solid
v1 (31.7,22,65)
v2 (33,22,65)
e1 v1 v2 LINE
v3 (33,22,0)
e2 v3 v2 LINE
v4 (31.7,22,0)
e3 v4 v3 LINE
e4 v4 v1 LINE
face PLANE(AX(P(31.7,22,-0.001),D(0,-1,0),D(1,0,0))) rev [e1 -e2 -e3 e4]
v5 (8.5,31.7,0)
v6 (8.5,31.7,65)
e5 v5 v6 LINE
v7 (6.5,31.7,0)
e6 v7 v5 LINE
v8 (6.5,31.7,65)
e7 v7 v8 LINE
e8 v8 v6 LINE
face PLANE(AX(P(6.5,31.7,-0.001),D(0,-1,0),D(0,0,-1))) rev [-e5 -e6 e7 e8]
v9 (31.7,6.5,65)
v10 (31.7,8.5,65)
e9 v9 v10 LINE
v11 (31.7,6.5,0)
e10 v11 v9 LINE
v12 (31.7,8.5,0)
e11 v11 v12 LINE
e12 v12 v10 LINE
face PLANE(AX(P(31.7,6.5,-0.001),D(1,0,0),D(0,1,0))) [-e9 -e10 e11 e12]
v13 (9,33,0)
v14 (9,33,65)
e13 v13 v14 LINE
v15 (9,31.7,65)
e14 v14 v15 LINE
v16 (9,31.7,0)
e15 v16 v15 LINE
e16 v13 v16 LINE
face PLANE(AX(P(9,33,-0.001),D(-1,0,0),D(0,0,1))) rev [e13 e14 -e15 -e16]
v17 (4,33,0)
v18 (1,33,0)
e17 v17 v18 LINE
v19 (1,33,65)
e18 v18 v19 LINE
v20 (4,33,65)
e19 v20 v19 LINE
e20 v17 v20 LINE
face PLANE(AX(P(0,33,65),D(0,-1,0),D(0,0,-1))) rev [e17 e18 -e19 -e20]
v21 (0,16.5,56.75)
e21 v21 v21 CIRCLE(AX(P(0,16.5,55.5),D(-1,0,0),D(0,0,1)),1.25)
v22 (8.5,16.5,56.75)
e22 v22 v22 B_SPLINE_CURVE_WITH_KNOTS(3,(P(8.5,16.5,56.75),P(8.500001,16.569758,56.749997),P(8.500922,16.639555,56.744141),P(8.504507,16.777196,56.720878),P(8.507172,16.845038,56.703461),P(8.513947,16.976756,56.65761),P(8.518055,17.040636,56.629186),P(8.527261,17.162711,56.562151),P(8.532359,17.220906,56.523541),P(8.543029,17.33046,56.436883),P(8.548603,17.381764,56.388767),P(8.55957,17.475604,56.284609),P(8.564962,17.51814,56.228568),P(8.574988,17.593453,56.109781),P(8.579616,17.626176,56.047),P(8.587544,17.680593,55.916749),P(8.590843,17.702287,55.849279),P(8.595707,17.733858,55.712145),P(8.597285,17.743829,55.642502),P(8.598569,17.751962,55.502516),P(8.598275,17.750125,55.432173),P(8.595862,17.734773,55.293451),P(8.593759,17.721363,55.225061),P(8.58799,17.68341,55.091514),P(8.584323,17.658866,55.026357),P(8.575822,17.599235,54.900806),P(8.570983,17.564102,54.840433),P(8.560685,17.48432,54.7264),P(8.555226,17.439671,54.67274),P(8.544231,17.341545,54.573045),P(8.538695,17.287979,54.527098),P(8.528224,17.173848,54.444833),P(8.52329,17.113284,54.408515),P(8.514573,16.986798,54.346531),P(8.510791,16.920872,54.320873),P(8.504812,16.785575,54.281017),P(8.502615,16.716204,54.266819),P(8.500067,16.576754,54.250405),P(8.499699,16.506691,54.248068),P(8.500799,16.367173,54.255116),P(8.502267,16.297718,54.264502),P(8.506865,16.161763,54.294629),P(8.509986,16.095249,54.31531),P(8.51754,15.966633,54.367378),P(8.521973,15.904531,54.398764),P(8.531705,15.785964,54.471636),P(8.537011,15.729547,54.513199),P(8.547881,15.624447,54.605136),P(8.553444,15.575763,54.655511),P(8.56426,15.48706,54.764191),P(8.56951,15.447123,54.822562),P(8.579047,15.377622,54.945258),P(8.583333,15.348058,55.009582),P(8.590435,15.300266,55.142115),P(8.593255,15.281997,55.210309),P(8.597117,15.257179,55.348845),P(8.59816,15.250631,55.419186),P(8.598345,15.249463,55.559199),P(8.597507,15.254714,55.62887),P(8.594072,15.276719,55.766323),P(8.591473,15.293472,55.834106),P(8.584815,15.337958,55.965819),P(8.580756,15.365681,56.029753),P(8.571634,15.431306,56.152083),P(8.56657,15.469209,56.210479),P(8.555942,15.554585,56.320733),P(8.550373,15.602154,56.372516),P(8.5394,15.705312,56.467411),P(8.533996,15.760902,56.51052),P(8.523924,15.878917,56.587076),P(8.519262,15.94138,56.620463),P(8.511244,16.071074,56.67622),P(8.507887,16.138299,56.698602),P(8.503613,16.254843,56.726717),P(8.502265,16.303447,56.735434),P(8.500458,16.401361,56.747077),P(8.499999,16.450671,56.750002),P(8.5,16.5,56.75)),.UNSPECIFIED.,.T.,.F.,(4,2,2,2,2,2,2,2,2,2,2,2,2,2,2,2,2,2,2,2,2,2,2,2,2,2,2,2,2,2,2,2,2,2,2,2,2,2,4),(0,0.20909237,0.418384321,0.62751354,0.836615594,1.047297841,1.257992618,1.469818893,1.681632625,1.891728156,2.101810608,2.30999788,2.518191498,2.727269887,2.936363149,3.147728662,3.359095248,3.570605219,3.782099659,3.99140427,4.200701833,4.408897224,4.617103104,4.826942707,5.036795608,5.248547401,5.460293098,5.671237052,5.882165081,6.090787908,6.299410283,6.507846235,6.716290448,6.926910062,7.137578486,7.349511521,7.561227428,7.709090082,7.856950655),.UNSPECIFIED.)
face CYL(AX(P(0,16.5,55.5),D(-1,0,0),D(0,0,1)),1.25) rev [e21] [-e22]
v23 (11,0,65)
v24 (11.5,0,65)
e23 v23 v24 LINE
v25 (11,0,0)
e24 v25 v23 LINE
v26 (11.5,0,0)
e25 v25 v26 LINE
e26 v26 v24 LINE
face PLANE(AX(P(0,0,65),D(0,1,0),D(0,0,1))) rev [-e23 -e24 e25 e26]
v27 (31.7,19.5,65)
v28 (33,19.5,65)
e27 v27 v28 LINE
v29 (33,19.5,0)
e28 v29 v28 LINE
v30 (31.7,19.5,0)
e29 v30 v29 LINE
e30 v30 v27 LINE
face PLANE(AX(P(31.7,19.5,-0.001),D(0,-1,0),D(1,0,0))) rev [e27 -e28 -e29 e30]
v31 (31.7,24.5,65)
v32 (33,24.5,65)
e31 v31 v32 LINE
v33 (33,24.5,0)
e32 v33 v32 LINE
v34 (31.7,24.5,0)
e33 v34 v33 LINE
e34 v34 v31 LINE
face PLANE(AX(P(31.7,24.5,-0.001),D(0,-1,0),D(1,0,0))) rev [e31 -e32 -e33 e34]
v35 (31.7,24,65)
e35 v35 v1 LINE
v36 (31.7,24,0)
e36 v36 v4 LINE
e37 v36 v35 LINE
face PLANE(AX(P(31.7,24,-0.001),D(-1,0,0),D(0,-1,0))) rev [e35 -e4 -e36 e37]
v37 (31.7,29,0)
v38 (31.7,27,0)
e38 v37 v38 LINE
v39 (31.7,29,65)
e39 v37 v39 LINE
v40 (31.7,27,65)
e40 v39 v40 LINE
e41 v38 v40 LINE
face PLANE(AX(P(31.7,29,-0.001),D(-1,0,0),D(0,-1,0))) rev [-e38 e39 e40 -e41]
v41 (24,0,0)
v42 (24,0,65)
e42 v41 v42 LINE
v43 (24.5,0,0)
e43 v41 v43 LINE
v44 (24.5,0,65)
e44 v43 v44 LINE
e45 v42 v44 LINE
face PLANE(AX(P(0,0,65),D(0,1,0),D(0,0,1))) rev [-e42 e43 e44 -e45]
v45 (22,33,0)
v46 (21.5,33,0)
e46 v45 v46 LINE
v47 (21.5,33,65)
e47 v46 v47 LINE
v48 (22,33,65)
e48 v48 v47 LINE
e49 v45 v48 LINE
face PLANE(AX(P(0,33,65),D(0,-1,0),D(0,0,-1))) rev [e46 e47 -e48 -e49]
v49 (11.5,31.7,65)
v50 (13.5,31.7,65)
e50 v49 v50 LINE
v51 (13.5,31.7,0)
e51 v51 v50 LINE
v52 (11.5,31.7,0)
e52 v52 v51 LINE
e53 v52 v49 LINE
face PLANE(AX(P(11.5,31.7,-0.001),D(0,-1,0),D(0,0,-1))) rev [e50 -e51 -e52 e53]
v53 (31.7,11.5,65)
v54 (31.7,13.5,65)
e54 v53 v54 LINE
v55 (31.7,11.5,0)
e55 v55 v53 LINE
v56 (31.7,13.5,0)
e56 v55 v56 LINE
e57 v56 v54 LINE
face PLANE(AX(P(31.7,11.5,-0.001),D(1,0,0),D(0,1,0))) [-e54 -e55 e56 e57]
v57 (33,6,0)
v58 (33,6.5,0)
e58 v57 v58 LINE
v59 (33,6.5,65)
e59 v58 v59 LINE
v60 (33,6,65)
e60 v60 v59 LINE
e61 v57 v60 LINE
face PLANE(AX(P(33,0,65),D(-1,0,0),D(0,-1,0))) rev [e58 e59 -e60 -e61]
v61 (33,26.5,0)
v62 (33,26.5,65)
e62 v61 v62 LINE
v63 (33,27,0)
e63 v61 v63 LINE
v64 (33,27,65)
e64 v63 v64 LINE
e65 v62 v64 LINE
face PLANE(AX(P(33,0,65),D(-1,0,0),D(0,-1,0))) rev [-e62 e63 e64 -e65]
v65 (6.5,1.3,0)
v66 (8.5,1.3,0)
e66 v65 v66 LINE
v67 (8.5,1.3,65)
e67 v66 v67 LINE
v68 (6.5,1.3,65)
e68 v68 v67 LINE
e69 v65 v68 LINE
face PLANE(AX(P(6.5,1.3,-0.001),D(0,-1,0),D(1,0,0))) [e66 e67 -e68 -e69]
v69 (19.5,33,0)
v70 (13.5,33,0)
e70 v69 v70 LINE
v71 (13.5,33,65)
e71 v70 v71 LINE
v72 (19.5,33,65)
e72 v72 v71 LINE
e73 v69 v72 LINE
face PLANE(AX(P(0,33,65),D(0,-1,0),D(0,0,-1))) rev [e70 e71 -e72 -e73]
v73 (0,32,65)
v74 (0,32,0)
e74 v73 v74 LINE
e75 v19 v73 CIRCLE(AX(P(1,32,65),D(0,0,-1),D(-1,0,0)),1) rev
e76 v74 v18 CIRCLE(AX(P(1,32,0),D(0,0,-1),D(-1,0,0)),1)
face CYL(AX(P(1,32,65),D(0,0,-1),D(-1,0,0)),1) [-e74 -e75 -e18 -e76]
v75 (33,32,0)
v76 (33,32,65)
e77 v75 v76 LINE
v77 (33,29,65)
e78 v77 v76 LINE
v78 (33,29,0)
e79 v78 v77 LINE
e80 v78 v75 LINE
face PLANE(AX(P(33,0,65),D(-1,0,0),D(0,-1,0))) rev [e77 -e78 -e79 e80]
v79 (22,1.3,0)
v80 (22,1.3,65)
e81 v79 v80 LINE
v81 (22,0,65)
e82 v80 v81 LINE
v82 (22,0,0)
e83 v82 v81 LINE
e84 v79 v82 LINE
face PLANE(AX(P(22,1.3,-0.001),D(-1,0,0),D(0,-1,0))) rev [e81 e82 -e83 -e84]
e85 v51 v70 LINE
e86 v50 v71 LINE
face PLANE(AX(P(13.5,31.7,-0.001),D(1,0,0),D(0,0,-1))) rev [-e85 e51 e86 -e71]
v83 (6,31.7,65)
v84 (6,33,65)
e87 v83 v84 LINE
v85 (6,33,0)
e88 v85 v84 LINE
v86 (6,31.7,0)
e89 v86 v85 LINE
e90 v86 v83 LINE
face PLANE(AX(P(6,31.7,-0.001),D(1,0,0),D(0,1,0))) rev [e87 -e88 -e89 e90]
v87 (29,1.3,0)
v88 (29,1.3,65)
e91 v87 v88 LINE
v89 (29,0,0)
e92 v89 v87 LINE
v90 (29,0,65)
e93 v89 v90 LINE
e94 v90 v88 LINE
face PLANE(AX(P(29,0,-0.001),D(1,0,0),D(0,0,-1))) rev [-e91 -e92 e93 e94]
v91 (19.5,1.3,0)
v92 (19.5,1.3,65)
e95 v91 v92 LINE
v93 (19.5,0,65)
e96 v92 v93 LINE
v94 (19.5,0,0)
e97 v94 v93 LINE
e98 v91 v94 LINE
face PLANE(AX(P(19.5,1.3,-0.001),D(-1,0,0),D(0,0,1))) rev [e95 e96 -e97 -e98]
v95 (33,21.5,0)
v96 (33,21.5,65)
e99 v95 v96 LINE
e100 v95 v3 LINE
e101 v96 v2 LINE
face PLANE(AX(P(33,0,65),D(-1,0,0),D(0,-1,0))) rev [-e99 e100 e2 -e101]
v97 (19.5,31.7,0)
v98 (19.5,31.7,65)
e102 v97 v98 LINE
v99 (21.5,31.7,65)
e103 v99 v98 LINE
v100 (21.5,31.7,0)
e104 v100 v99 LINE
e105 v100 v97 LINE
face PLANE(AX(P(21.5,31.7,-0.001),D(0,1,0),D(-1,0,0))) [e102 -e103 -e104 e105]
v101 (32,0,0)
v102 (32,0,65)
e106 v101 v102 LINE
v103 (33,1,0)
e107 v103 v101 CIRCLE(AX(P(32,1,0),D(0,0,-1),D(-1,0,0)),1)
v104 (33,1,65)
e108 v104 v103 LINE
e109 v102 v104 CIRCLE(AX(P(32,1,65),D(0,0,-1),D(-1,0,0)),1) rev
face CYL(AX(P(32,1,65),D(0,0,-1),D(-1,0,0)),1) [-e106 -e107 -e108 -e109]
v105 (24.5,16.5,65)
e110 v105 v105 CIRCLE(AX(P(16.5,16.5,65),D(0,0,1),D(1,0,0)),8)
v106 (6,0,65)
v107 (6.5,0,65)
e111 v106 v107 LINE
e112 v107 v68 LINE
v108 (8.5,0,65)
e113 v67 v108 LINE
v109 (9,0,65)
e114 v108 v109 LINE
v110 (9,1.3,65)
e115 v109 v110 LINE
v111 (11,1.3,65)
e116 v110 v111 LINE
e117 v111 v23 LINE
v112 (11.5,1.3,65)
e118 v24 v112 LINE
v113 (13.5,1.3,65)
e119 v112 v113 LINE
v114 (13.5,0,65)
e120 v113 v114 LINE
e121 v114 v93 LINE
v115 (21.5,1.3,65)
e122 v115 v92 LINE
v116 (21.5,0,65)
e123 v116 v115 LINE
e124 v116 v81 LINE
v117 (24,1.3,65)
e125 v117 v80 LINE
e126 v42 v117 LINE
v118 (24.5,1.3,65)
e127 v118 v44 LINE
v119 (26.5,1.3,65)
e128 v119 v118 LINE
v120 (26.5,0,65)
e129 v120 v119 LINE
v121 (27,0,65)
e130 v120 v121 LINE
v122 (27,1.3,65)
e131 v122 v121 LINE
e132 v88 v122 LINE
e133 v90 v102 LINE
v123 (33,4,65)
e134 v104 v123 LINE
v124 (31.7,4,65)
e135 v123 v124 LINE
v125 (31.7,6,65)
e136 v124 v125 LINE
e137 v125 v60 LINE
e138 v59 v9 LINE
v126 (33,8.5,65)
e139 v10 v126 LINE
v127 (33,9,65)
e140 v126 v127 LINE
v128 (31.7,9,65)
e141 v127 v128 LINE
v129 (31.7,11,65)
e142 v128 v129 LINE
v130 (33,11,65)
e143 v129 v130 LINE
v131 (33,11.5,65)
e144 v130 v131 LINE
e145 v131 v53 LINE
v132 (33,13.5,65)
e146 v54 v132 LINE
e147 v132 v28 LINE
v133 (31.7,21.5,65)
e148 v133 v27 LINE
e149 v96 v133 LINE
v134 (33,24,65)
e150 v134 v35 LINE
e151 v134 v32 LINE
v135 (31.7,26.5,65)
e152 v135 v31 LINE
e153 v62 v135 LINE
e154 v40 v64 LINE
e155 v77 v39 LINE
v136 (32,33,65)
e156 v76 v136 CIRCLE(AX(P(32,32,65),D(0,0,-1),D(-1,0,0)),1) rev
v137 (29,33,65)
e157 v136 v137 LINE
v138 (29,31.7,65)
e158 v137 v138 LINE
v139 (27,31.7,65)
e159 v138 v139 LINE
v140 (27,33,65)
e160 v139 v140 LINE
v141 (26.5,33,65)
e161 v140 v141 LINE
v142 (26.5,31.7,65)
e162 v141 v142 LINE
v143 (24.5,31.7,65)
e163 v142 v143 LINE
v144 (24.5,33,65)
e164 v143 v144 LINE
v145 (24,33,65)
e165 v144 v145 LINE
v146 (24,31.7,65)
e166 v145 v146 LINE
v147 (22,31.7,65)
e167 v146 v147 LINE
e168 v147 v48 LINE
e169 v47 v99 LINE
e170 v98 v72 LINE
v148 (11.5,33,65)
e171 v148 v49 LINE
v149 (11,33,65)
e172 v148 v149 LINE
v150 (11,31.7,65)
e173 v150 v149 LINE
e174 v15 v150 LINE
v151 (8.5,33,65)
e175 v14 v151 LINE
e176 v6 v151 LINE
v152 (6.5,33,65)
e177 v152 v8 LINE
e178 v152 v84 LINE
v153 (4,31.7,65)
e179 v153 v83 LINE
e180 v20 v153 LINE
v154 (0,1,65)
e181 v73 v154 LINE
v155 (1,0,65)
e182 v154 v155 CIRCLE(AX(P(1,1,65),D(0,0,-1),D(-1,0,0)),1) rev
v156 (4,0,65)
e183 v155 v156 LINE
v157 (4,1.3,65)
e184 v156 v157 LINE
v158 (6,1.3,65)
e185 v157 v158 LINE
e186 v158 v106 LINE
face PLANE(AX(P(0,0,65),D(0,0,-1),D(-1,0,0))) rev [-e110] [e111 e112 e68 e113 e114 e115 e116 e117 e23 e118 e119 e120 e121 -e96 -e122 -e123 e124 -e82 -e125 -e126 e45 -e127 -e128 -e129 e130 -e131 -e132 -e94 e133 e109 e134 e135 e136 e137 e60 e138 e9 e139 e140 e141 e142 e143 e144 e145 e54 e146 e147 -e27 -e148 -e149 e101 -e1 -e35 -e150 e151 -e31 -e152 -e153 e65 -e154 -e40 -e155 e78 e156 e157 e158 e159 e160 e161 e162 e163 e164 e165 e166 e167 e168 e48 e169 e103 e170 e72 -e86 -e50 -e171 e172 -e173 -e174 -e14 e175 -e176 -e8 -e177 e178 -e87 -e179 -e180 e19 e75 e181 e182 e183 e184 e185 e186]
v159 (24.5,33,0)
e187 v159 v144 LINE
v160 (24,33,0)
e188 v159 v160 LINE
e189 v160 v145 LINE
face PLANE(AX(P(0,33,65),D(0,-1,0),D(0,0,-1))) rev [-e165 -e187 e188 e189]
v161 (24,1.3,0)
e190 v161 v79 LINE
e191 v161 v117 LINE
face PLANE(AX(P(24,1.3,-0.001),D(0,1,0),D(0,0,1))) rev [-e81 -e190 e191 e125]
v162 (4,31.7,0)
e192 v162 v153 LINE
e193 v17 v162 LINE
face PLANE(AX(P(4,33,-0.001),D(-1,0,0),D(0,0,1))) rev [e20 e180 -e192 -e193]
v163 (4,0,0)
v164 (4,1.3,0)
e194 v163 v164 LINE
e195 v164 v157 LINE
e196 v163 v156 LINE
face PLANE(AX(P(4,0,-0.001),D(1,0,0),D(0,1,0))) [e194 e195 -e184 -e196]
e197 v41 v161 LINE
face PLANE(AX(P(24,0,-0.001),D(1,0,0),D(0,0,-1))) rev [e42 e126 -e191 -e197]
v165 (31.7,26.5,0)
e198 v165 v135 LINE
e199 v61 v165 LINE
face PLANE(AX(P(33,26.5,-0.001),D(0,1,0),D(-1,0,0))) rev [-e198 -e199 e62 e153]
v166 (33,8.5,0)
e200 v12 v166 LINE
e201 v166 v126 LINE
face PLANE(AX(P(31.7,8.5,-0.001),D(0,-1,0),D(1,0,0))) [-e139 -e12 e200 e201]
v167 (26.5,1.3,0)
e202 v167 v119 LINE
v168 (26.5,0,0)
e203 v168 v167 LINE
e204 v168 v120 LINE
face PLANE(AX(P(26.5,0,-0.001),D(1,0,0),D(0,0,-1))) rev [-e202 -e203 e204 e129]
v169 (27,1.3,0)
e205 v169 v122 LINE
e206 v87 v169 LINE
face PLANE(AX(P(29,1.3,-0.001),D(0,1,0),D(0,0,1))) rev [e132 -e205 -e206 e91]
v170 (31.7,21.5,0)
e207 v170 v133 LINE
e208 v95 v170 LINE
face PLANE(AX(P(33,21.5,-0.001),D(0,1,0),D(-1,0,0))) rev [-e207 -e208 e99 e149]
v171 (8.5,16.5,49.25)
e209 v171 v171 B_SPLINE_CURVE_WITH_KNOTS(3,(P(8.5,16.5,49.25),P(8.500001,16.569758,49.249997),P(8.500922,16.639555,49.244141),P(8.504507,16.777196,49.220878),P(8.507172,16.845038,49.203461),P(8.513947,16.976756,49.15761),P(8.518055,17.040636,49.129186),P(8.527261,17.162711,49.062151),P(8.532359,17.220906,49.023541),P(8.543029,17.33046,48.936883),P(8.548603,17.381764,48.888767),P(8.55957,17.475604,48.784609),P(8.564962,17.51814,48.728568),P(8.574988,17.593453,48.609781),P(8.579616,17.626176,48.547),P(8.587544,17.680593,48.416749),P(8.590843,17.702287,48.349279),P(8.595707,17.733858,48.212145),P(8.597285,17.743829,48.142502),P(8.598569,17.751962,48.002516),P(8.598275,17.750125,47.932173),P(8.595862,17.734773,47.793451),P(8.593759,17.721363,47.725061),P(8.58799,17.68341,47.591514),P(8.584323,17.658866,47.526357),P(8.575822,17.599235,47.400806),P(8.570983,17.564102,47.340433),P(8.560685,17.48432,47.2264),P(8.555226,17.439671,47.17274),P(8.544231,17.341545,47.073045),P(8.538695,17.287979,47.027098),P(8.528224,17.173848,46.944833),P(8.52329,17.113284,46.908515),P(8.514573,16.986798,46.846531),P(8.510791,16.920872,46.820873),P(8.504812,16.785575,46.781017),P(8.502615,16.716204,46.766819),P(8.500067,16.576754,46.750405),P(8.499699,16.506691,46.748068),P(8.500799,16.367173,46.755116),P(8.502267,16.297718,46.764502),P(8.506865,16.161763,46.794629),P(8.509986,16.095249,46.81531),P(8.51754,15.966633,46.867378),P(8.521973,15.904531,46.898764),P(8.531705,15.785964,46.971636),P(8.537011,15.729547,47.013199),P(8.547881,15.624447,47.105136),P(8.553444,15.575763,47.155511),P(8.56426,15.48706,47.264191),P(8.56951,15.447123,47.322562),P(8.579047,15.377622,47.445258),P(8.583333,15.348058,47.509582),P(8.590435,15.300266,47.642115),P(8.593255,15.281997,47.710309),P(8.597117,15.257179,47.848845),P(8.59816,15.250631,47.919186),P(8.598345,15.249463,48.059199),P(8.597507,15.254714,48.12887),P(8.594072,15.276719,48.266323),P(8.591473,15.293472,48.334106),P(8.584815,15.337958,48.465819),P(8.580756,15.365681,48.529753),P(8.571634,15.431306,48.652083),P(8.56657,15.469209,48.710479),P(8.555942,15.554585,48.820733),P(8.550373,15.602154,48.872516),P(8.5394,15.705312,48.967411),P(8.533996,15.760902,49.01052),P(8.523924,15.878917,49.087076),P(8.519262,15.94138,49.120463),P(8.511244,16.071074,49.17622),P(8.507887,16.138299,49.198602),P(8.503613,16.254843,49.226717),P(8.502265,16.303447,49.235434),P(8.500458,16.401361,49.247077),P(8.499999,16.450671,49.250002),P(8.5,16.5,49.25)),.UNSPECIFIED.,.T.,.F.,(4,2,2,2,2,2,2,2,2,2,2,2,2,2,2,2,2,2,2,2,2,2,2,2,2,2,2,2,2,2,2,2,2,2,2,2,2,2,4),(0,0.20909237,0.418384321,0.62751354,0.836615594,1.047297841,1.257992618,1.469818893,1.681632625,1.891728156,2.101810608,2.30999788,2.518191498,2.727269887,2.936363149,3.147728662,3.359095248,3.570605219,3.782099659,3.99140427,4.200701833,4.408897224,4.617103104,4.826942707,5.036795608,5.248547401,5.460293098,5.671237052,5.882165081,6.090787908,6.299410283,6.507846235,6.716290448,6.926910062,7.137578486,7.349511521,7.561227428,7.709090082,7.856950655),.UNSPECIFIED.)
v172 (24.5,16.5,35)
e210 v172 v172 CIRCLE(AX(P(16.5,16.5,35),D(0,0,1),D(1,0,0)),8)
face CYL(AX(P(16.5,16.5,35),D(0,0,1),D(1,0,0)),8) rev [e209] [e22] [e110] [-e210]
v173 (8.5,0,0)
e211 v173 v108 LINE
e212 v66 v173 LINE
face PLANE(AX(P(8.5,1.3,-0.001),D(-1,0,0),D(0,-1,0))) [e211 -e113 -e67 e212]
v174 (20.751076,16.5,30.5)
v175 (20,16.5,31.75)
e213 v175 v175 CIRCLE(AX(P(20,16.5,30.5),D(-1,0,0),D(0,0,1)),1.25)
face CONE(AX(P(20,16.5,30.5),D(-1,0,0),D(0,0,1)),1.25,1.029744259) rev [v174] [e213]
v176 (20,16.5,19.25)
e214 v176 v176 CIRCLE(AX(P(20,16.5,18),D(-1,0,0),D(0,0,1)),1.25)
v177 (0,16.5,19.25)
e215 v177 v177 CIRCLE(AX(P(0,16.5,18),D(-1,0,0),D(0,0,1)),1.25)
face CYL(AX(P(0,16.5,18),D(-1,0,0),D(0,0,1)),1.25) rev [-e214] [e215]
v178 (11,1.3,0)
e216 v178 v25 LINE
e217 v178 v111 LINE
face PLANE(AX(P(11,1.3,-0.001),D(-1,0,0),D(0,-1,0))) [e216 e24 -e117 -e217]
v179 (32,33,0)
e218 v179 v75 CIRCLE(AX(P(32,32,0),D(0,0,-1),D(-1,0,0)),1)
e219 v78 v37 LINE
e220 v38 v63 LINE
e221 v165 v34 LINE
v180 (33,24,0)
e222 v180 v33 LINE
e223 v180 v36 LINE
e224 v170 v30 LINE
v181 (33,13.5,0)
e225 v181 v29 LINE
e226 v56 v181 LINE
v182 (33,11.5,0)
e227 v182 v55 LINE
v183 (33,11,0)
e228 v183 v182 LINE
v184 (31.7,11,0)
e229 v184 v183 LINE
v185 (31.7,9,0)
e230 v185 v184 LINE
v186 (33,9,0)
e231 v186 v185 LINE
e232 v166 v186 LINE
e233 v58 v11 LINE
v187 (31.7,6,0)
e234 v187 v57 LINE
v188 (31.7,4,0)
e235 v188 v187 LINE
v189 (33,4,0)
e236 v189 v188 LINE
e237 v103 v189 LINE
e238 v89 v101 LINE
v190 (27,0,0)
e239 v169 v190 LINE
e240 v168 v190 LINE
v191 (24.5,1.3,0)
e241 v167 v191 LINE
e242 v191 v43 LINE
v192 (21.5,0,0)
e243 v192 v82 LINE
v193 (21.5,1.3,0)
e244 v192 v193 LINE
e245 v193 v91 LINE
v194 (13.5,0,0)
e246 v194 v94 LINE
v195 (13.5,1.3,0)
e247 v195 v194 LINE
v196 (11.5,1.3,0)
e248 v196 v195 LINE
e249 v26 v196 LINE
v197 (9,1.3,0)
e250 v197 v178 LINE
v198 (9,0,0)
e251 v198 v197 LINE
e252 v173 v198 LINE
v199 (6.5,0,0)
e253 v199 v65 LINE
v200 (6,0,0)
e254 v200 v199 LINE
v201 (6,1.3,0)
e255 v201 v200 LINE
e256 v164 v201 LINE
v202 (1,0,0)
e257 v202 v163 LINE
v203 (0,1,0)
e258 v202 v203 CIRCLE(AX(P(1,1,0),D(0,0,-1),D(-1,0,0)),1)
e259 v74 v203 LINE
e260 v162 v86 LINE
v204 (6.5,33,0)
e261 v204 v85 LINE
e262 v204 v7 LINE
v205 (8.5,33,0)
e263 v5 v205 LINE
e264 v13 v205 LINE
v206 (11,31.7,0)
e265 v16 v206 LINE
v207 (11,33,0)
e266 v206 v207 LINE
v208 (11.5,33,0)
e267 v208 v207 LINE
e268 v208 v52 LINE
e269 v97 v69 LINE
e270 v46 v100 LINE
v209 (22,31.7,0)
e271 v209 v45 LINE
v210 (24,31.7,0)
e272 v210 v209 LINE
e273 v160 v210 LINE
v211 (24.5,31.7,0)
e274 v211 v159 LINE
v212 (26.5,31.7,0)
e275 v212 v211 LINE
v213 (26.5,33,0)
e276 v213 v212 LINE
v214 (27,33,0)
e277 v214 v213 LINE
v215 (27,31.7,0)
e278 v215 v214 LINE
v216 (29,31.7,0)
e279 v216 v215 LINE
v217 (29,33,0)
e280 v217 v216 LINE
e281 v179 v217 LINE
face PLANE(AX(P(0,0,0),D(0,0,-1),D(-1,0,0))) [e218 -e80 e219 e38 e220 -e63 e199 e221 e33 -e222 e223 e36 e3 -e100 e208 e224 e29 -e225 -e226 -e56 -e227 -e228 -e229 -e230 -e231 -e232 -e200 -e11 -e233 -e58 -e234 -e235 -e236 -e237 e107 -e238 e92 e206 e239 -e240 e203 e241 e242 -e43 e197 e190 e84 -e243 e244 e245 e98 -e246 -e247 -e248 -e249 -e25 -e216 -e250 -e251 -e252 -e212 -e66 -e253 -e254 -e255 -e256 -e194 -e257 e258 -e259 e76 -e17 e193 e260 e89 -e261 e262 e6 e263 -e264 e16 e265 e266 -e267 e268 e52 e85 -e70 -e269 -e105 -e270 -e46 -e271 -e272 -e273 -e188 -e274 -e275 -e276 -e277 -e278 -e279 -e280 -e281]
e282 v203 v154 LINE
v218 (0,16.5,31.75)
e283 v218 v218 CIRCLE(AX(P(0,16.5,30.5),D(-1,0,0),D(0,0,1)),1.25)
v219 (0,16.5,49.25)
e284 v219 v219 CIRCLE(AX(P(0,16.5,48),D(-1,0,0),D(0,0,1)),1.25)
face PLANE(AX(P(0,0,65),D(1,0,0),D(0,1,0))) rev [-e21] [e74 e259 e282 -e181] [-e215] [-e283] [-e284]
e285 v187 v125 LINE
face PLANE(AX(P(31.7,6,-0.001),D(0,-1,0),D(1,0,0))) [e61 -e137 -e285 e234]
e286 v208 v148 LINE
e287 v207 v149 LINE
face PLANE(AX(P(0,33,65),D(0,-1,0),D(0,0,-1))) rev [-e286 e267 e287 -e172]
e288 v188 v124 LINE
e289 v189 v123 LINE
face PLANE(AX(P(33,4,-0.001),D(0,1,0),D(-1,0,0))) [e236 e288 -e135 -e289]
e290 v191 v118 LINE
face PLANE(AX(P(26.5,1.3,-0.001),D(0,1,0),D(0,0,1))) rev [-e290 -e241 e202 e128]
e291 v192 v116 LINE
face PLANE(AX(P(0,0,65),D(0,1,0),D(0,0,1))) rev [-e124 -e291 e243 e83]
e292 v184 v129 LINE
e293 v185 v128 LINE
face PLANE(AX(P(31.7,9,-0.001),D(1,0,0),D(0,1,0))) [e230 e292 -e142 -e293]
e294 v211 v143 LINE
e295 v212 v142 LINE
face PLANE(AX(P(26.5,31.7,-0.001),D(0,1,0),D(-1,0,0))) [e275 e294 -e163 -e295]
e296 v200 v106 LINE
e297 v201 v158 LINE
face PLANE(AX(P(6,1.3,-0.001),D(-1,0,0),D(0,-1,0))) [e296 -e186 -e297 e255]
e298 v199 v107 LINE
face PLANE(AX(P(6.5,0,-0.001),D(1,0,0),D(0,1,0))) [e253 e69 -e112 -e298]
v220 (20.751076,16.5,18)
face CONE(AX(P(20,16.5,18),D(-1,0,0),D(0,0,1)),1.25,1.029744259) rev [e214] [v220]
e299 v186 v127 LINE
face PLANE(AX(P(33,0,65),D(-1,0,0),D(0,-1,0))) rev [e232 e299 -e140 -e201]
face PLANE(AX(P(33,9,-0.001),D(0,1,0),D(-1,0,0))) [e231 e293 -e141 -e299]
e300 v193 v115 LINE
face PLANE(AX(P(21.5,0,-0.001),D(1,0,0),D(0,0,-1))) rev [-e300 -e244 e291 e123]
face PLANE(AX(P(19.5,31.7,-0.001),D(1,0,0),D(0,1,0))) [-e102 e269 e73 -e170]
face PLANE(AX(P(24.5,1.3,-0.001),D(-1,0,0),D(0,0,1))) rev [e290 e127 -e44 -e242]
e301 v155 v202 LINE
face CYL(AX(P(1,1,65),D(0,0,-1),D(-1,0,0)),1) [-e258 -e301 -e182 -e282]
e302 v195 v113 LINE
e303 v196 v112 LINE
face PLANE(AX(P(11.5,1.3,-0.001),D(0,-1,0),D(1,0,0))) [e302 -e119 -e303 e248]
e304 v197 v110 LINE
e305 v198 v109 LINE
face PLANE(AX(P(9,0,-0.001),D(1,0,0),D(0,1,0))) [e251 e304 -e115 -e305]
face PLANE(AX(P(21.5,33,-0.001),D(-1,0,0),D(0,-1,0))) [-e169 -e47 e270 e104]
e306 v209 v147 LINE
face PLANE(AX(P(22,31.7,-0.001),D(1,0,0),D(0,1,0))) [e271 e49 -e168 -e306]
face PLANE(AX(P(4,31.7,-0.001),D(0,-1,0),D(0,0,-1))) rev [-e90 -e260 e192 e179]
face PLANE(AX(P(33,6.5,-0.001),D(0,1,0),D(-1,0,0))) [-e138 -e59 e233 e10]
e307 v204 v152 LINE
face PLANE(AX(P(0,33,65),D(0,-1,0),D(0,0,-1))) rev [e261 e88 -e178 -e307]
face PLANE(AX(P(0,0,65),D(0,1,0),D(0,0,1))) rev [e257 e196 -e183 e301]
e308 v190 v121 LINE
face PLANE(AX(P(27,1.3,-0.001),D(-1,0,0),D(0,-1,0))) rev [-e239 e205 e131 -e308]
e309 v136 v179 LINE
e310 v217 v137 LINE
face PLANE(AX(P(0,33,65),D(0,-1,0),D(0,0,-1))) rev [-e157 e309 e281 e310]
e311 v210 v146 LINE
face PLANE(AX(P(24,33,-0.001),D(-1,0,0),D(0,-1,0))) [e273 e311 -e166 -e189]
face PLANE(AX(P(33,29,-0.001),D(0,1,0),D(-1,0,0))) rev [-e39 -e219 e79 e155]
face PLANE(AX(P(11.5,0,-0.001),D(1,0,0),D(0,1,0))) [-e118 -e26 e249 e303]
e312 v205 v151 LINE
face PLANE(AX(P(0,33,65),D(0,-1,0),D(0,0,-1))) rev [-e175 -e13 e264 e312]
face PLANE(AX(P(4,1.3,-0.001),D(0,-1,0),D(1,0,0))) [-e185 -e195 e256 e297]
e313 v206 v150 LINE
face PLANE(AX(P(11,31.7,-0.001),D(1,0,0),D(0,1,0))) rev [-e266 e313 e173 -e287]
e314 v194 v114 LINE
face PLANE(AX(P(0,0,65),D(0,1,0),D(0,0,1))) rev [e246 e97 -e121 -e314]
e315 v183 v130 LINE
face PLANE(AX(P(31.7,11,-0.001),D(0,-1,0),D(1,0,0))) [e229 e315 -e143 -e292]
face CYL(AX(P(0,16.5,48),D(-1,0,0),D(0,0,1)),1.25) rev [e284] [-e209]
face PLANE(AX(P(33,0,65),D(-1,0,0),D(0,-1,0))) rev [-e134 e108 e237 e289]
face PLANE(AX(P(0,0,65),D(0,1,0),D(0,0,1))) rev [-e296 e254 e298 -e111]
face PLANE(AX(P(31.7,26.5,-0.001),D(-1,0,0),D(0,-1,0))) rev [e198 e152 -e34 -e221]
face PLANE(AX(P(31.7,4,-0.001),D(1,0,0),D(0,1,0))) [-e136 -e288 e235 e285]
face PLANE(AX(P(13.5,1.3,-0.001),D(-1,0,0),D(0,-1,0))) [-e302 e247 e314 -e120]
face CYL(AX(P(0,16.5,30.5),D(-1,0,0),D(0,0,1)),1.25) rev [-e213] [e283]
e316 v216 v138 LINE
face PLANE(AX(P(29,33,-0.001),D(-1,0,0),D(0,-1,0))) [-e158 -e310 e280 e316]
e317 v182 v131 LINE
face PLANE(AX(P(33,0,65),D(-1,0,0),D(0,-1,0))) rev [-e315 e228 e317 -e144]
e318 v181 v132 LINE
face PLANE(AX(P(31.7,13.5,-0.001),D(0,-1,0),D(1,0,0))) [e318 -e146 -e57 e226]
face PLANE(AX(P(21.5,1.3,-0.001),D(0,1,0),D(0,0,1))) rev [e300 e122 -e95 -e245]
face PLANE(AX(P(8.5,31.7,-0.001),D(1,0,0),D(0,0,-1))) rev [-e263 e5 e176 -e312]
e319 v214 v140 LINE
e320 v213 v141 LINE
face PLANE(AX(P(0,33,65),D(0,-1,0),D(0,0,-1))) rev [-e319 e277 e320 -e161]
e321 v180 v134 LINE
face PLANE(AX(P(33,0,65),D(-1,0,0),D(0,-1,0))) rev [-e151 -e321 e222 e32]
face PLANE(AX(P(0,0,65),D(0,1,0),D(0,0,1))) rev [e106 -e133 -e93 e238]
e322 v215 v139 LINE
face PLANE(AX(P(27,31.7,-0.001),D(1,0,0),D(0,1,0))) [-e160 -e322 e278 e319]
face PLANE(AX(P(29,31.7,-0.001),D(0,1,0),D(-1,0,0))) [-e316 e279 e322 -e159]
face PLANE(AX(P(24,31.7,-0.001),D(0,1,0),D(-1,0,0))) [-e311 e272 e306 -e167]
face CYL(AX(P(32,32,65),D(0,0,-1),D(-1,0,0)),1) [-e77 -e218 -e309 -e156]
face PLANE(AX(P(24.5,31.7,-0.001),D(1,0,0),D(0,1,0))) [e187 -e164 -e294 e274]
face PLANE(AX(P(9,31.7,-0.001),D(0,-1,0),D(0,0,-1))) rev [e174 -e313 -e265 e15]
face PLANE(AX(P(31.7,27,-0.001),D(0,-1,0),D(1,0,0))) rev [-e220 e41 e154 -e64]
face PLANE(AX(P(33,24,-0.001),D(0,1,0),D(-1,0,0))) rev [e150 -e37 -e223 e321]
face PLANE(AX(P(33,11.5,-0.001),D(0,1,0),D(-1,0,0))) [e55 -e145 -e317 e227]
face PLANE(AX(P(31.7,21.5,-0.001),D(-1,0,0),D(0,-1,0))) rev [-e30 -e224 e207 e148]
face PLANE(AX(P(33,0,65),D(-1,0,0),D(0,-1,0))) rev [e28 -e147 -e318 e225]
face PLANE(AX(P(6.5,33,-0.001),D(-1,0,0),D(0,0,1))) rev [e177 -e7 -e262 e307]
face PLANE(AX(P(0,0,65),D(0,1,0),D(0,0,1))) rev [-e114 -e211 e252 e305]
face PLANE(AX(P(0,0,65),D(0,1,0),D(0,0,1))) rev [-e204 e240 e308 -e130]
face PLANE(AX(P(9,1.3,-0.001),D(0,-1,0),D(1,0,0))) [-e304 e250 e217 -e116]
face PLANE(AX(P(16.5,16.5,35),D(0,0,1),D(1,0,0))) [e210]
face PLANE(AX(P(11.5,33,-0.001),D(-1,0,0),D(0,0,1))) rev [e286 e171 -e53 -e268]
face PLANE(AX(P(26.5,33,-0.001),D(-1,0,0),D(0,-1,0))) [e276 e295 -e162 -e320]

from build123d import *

# Parameters (mm, degrees)
SKETCH1_W                   = 33
SKETCH1_H                   = 33
BOSS_EXTRUDE1_DEPTH         = 65
FILLET1_R                   = 1
CUT_EXTRUDE2_START          = -30
CUT_EXTRUDE2_OUTLINE_R      = 8
CUT_EXTRUDE2_DEPTH          = 30
TAP_DRILL_FOR_M3_TAP1_D     = 2.5
TAP_DRILL_FOR_M3_TAP1_DEPTH = 20
TAP_DRILL_FOR_M3_TAP1_TIP   = 0.751075774
CUT_EXTRUDE5_REACH          = 82.019
SKETCH6_W                   = 2
SKETCH6_H                   = 1.3
CIRPATTERN1_COUNT           = 3
CIRPATTERN1_ANGLE           = 180
CIRPATTERN1_COPY_1_REACH    = 82.019
CIRPATTERN1_COPY_1_SKETCH_W = 2
CIRPATTERN1_COPY_1_SKETCH_H = 1.3
CIRPATTERN1_COPY_2_REACH    = 82.019
CIRPATTERN1_COPY_2_SKETCH_W = 2
CIRPATTERN1_COPY_2_SKETCH_H = 1.3


# Read off the part's stored shape, not the designer's step: Cut-Extrude2
with BuildPart() as part:
    # Sketch1 → Boss-Extrude1 (new body)
    with BuildSketch(Plane.XY):
        with Locations((16.5, 16.5)):
            Rectangle(SKETCH1_W, SKETCH1_H)
    extrude(amount=BOSS_EXTRUDE1_DEPTH)

    # Fillet1
    fillet1_edges = [part.edges().sort_by_distance(p)[0] for p in [
        (0, 33, 32.5),
        (33, 33, 32.5),
        (33, 0, 32.5),
        (0, 0, 32.5),
    ]]
    fillet(fillet1_edges, radius=FILLET1_R)

    # Cut-Extrude2 outline → Cut-Extrude2 (cut)
    with BuildSketch(Plane.XY.offset(65).offset(CUT_EXTRUDE2_START)):
        with Locations((16.5, 16.5)):
            Circle(CUT_EXTRUDE2_OUTLINE_R)
    extrude(amount=CUT_EXTRUDE2_DEPTH, mode=Mode.SUBTRACT)

    # Tap Drill for M3 Tap1
    with Locations(Plane(origin=(0, 0, 0), x_dir=(0, -1, 0), z_dir=(-1, 0, 0))):
        with Locations((-16.5, 55.5), (-16.5, 48), (-16.5, 30.5), (-16.5, 18)):
            Hole(TAP_DRILL_FOR_M3_TAP1_D / 2, depth=TAP_DRILL_FOR_M3_TAP1_DEPTH)
            with Locations((0, 0, -(TAP_DRILL_FOR_M3_TAP1_DEPTH + TAP_DRILL_FOR_M3_TAP1_TIP / 2))):  # 118° drill point
                Cone(0, TAP_DRILL_FOR_M3_TAP1_D / 2, TAP_DRILL_FOR_M3_TAP1_TIP, mode=Mode.SUBTRACT)

    # Sketch6 → Cut-Extrude5 (cut, up to next)
    with BuildSketch(Plane.XY.offset(65), mode=Mode.PRIVATE) as cut_extrude5_sk1:
        with Locations((5, 32.35)):
            Rectangle(SKETCH6_W, SKETCH6_H)
    cut_extrude5_tool1 = extrude(cut_extrude5_sk1.sketch, amount=-CUT_EXTRUDE5_REACH, mode=Mode.PRIVATE) & part.part
    # Sketch6 → Cut-Extrude5 (cut, up to next)
    with BuildSketch(Plane.XY.offset(65), mode=Mode.PRIVATE) as cut_extrude5_sk2:
        with Locations((7.5, 32.35)):
            Rectangle(SKETCH6_W, SKETCH6_H)
    cut_extrude5_tool2 = extrude(cut_extrude5_sk2.sketch, amount=-CUT_EXTRUDE5_REACH, mode=Mode.PRIVATE) & part.part
    # Sketch6 → Cut-Extrude5 (cut, up to next)
    with BuildSketch(Plane.XY.offset(65), mode=Mode.PRIVATE) as cut_extrude5_sk3:
        with Locations((10, 32.35)):
            Rectangle(SKETCH6_W, SKETCH6_H)
    cut_extrude5_tool3 = extrude(cut_extrude5_sk3.sketch, amount=-CUT_EXTRUDE5_REACH, mode=Mode.PRIVATE) & part.part
    # Sketch6 → Cut-Extrude5 (cut, up to next)
    with BuildSketch(Plane.XY.offset(65), mode=Mode.PRIVATE) as cut_extrude5_sk4:
        with Locations((12.5, 32.35)):
            Rectangle(SKETCH6_W, SKETCH6_H)
    cut_extrude5_tool4 = extrude(cut_extrude5_sk4.sketch, amount=-CUT_EXTRUDE5_REACH, mode=Mode.PRIVATE) & part.part
    cut_extrude5_1 = cut_extrude5_tool1.solids().sort_by_distance((5, 32.35, 65))[0]
    add(cut_extrude5_1, mode=Mode.SUBTRACT)
    cut_extrude5_2 = cut_extrude5_tool2.solids().sort_by_distance((7.5, 32.35, 65))[0]
    add(cut_extrude5_2, mode=Mode.SUBTRACT)
    cut_extrude5_3 = cut_extrude5_tool3.solids().sort_by_distance((10, 32.35, 65))[0]
    add(cut_extrude5_3, mode=Mode.SUBTRACT)
    cut_extrude5_4 = cut_extrude5_tool4.solids().sort_by_distance((12.5, 32.35, 65))[0]
    add(cut_extrude5_4, mode=Mode.SUBTRACT)
    cut_extrude5 = cut_extrude5_1 + cut_extrude5_2 + cut_extrude5_3 + cut_extrude5_4  # Cut-Extrude5 as one shape, for the pattern or mirror that repeats it

    # Mirror2: Cut-Extrude5 across plane
    add(cut_extrude5.mirror(Plane(origin=(16.5, 0, 0), x_dir=(0, 0, 1), z_dir=(1, 0, 0))), mode=Mode.SUBTRACT)

    # CirPattern1: Cut-Extrude5 ×3 about axis
    cirpattern1_axis = Axis((16.5, 16.5, 0), (0, 0, -1))
    for i in range(1, CIRPATTERN1_COUNT):
        add(cut_extrude5.rotate(cirpattern1_axis, i * CIRPATTERN1_ANGLE / (CIRPATTERN1_COUNT - 1)), mode=Mode.SUBTRACT)

    # CirPattern1 copy 1 sketch → CirPattern1 copy 1 (cut, up to next)
    with BuildSketch(Plane(origin=(0, 0, 65), x_dir=(0, 1, 0), z_dir=(0, 0, 1)), mode=Mode.PRIVATE) as cirpattern1_copy_1_sk1:
        with Locations((5, -32.35)):
            Rectangle(CIRPATTERN1_COPY_1_SKETCH_W, CIRPATTERN1_COPY_1_SKETCH_H)
    cirpattern1_copy_1_tool1 = extrude(cirpattern1_copy_1_sk1.sketch, amount=-CIRPATTERN1_COPY_1_REACH, mode=Mode.PRIVATE) & part.part
    # CirPattern1 copy 1 sketch → CirPattern1 copy 1 (cut, up to next)
    with BuildSketch(Plane(origin=(0, 0, 65), x_dir=(0, 1, 0), z_dir=(0, 0, 1)), mode=Mode.PRIVATE) as cirpattern1_copy_1_sk2:
        with Locations((7.5, -32.35)):
            Rectangle(CIRPATTERN1_COPY_1_SKETCH_W, CIRPATTERN1_COPY_1_SKETCH_H)
    cirpattern1_copy_1_tool2 = extrude(cirpattern1_copy_1_sk2.sketch, amount=-CIRPATTERN1_COPY_1_REACH, mode=Mode.PRIVATE) & part.part
    # CirPattern1 copy 1 sketch → CirPattern1 copy 1 (cut, up to next)
    with BuildSketch(Plane(origin=(0, 0, 65), x_dir=(0, 1, 0), z_dir=(0, 0, 1)), mode=Mode.PRIVATE) as cirpattern1_copy_1_sk3:
        with Locations((10, -32.35)):
            Rectangle(CIRPATTERN1_COPY_1_SKETCH_W, CIRPATTERN1_COPY_1_SKETCH_H)
    cirpattern1_copy_1_tool3 = extrude(cirpattern1_copy_1_sk3.sketch, amount=-CIRPATTERN1_COPY_1_REACH, mode=Mode.PRIVATE) & part.part
    # CirPattern1 copy 1 sketch → CirPattern1 copy 1 (cut, up to next)
    with BuildSketch(Plane(origin=(0, 0, 65), x_dir=(0, 1, 0), z_dir=(0, 0, 1)), mode=Mode.PRIVATE) as cirpattern1_copy_1_sk4:
        with Locations((12.5, -32.35)):
            Rectangle(CIRPATTERN1_COPY_1_SKETCH_W, CIRPATTERN1_COPY_1_SKETCH_H)
    cirpattern1_copy_1_tool4 = extrude(cirpattern1_copy_1_sk4.sketch, amount=-CIRPATTERN1_COPY_1_REACH, mode=Mode.PRIVATE) & part.part
    add(cirpattern1_copy_1_tool1.solids().sort_by_distance((32.35, 5, 65))[0], mode=Mode.SUBTRACT)
    add(cirpattern1_copy_1_tool2.solids().sort_by_distance((32.35, 7.5, 65))[0], mode=Mode.SUBTRACT)
    add(cirpattern1_copy_1_tool3.solids().sort_by_distance((32.35, 10, 65))[0], mode=Mode.SUBTRACT)
    add(cirpattern1_copy_1_tool4.solids().sort_by_distance((32.35, 12.5, 65))[0], mode=Mode.SUBTRACT)

    # CirPattern1 copy 2 sketch → CirPattern1 copy 2 (cut, up to next)
    with BuildSketch(Plane(origin=(0, 33, 65), x_dir=(1, 0, 0), z_dir=(0, 0, 1)), mode=Mode.PRIVATE) as cirpattern1_copy_2_sk1:
        with Locations((5, -32.35)):
            Rectangle(CIRPATTERN1_COPY_2_SKETCH_W, CIRPATTERN1_COPY_2_SKETCH_H)
    cirpattern1_copy_2_tool1 = extrude(cirpattern1_copy_2_sk1.sketch, amount=-CIRPATTERN1_COPY_2_REACH, mode=Mode.PRIVATE) & part.part
    # CirPattern1 copy 2 sketch → CirPattern1 copy 2 (cut, up to next)
    with BuildSketch(Plane(origin=(0, 33, 65), x_dir=(1, 0, 0), z_dir=(0, 0, 1)), mode=Mode.PRIVATE) as cirpattern1_copy_2_sk2:
        with Locations((7.5, -32.35)):
            Rectangle(CIRPATTERN1_COPY_2_SKETCH_W, CIRPATTERN1_COPY_2_SKETCH_H)
    cirpattern1_copy_2_tool2 = extrude(cirpattern1_copy_2_sk2.sketch, amount=-CIRPATTERN1_COPY_2_REACH, mode=Mode.PRIVATE) & part.part
    # CirPattern1 copy 2 sketch → CirPattern1 copy 2 (cut, up to next)
    with BuildSketch(Plane(origin=(0, 33, 65), x_dir=(1, 0, 0), z_dir=(0, 0, 1)), mode=Mode.PRIVATE) as cirpattern1_copy_2_sk3:
        with Locations((10, -32.35)):
            Rectangle(CIRPATTERN1_COPY_2_SKETCH_W, CIRPATTERN1_COPY_2_SKETCH_H)
    cirpattern1_copy_2_tool3 = extrude(cirpattern1_copy_2_sk3.sketch, amount=-CIRPATTERN1_COPY_2_REACH, mode=Mode.PRIVATE) & part.part
    # CirPattern1 copy 2 sketch → CirPattern1 copy 2 (cut, up to next)
    with BuildSketch(Plane(origin=(0, 33, 65), x_dir=(1, 0, 0), z_dir=(0, 0, 1)), mode=Mode.PRIVATE) as cirpattern1_copy_2_sk4:
        with Locations((12.5, -32.35)):
            Rectangle(CIRPATTERN1_COPY_2_SKETCH_W, CIRPATTERN1_COPY_2_SKETCH_H)
    cirpattern1_copy_2_tool4 = extrude(cirpattern1_copy_2_sk4.sketch, amount=-CIRPATTERN1_COPY_2_REACH, mode=Mode.PRIVATE) & part.part
    add(cirpattern1_copy_2_tool1.solids().sort_by_distance((5, 0.65, 65))[0], mode=Mode.SUBTRACT)
    add(cirpattern1_copy_2_tool2.solids().sort_by_distance((7.5, 0.65, 65))[0], mode=Mode.SUBTRACT)
    add(cirpattern1_copy_2_tool3.solids().sort_by_distance((10, 0.65, 65))[0], mode=Mode.SUBTRACT)
    add(cirpattern1_copy_2_tool4.solids().sort_by_distance((12.5, 0.65, 65))[0], mode=Mode.SUBTRACT)


solid = part.part
